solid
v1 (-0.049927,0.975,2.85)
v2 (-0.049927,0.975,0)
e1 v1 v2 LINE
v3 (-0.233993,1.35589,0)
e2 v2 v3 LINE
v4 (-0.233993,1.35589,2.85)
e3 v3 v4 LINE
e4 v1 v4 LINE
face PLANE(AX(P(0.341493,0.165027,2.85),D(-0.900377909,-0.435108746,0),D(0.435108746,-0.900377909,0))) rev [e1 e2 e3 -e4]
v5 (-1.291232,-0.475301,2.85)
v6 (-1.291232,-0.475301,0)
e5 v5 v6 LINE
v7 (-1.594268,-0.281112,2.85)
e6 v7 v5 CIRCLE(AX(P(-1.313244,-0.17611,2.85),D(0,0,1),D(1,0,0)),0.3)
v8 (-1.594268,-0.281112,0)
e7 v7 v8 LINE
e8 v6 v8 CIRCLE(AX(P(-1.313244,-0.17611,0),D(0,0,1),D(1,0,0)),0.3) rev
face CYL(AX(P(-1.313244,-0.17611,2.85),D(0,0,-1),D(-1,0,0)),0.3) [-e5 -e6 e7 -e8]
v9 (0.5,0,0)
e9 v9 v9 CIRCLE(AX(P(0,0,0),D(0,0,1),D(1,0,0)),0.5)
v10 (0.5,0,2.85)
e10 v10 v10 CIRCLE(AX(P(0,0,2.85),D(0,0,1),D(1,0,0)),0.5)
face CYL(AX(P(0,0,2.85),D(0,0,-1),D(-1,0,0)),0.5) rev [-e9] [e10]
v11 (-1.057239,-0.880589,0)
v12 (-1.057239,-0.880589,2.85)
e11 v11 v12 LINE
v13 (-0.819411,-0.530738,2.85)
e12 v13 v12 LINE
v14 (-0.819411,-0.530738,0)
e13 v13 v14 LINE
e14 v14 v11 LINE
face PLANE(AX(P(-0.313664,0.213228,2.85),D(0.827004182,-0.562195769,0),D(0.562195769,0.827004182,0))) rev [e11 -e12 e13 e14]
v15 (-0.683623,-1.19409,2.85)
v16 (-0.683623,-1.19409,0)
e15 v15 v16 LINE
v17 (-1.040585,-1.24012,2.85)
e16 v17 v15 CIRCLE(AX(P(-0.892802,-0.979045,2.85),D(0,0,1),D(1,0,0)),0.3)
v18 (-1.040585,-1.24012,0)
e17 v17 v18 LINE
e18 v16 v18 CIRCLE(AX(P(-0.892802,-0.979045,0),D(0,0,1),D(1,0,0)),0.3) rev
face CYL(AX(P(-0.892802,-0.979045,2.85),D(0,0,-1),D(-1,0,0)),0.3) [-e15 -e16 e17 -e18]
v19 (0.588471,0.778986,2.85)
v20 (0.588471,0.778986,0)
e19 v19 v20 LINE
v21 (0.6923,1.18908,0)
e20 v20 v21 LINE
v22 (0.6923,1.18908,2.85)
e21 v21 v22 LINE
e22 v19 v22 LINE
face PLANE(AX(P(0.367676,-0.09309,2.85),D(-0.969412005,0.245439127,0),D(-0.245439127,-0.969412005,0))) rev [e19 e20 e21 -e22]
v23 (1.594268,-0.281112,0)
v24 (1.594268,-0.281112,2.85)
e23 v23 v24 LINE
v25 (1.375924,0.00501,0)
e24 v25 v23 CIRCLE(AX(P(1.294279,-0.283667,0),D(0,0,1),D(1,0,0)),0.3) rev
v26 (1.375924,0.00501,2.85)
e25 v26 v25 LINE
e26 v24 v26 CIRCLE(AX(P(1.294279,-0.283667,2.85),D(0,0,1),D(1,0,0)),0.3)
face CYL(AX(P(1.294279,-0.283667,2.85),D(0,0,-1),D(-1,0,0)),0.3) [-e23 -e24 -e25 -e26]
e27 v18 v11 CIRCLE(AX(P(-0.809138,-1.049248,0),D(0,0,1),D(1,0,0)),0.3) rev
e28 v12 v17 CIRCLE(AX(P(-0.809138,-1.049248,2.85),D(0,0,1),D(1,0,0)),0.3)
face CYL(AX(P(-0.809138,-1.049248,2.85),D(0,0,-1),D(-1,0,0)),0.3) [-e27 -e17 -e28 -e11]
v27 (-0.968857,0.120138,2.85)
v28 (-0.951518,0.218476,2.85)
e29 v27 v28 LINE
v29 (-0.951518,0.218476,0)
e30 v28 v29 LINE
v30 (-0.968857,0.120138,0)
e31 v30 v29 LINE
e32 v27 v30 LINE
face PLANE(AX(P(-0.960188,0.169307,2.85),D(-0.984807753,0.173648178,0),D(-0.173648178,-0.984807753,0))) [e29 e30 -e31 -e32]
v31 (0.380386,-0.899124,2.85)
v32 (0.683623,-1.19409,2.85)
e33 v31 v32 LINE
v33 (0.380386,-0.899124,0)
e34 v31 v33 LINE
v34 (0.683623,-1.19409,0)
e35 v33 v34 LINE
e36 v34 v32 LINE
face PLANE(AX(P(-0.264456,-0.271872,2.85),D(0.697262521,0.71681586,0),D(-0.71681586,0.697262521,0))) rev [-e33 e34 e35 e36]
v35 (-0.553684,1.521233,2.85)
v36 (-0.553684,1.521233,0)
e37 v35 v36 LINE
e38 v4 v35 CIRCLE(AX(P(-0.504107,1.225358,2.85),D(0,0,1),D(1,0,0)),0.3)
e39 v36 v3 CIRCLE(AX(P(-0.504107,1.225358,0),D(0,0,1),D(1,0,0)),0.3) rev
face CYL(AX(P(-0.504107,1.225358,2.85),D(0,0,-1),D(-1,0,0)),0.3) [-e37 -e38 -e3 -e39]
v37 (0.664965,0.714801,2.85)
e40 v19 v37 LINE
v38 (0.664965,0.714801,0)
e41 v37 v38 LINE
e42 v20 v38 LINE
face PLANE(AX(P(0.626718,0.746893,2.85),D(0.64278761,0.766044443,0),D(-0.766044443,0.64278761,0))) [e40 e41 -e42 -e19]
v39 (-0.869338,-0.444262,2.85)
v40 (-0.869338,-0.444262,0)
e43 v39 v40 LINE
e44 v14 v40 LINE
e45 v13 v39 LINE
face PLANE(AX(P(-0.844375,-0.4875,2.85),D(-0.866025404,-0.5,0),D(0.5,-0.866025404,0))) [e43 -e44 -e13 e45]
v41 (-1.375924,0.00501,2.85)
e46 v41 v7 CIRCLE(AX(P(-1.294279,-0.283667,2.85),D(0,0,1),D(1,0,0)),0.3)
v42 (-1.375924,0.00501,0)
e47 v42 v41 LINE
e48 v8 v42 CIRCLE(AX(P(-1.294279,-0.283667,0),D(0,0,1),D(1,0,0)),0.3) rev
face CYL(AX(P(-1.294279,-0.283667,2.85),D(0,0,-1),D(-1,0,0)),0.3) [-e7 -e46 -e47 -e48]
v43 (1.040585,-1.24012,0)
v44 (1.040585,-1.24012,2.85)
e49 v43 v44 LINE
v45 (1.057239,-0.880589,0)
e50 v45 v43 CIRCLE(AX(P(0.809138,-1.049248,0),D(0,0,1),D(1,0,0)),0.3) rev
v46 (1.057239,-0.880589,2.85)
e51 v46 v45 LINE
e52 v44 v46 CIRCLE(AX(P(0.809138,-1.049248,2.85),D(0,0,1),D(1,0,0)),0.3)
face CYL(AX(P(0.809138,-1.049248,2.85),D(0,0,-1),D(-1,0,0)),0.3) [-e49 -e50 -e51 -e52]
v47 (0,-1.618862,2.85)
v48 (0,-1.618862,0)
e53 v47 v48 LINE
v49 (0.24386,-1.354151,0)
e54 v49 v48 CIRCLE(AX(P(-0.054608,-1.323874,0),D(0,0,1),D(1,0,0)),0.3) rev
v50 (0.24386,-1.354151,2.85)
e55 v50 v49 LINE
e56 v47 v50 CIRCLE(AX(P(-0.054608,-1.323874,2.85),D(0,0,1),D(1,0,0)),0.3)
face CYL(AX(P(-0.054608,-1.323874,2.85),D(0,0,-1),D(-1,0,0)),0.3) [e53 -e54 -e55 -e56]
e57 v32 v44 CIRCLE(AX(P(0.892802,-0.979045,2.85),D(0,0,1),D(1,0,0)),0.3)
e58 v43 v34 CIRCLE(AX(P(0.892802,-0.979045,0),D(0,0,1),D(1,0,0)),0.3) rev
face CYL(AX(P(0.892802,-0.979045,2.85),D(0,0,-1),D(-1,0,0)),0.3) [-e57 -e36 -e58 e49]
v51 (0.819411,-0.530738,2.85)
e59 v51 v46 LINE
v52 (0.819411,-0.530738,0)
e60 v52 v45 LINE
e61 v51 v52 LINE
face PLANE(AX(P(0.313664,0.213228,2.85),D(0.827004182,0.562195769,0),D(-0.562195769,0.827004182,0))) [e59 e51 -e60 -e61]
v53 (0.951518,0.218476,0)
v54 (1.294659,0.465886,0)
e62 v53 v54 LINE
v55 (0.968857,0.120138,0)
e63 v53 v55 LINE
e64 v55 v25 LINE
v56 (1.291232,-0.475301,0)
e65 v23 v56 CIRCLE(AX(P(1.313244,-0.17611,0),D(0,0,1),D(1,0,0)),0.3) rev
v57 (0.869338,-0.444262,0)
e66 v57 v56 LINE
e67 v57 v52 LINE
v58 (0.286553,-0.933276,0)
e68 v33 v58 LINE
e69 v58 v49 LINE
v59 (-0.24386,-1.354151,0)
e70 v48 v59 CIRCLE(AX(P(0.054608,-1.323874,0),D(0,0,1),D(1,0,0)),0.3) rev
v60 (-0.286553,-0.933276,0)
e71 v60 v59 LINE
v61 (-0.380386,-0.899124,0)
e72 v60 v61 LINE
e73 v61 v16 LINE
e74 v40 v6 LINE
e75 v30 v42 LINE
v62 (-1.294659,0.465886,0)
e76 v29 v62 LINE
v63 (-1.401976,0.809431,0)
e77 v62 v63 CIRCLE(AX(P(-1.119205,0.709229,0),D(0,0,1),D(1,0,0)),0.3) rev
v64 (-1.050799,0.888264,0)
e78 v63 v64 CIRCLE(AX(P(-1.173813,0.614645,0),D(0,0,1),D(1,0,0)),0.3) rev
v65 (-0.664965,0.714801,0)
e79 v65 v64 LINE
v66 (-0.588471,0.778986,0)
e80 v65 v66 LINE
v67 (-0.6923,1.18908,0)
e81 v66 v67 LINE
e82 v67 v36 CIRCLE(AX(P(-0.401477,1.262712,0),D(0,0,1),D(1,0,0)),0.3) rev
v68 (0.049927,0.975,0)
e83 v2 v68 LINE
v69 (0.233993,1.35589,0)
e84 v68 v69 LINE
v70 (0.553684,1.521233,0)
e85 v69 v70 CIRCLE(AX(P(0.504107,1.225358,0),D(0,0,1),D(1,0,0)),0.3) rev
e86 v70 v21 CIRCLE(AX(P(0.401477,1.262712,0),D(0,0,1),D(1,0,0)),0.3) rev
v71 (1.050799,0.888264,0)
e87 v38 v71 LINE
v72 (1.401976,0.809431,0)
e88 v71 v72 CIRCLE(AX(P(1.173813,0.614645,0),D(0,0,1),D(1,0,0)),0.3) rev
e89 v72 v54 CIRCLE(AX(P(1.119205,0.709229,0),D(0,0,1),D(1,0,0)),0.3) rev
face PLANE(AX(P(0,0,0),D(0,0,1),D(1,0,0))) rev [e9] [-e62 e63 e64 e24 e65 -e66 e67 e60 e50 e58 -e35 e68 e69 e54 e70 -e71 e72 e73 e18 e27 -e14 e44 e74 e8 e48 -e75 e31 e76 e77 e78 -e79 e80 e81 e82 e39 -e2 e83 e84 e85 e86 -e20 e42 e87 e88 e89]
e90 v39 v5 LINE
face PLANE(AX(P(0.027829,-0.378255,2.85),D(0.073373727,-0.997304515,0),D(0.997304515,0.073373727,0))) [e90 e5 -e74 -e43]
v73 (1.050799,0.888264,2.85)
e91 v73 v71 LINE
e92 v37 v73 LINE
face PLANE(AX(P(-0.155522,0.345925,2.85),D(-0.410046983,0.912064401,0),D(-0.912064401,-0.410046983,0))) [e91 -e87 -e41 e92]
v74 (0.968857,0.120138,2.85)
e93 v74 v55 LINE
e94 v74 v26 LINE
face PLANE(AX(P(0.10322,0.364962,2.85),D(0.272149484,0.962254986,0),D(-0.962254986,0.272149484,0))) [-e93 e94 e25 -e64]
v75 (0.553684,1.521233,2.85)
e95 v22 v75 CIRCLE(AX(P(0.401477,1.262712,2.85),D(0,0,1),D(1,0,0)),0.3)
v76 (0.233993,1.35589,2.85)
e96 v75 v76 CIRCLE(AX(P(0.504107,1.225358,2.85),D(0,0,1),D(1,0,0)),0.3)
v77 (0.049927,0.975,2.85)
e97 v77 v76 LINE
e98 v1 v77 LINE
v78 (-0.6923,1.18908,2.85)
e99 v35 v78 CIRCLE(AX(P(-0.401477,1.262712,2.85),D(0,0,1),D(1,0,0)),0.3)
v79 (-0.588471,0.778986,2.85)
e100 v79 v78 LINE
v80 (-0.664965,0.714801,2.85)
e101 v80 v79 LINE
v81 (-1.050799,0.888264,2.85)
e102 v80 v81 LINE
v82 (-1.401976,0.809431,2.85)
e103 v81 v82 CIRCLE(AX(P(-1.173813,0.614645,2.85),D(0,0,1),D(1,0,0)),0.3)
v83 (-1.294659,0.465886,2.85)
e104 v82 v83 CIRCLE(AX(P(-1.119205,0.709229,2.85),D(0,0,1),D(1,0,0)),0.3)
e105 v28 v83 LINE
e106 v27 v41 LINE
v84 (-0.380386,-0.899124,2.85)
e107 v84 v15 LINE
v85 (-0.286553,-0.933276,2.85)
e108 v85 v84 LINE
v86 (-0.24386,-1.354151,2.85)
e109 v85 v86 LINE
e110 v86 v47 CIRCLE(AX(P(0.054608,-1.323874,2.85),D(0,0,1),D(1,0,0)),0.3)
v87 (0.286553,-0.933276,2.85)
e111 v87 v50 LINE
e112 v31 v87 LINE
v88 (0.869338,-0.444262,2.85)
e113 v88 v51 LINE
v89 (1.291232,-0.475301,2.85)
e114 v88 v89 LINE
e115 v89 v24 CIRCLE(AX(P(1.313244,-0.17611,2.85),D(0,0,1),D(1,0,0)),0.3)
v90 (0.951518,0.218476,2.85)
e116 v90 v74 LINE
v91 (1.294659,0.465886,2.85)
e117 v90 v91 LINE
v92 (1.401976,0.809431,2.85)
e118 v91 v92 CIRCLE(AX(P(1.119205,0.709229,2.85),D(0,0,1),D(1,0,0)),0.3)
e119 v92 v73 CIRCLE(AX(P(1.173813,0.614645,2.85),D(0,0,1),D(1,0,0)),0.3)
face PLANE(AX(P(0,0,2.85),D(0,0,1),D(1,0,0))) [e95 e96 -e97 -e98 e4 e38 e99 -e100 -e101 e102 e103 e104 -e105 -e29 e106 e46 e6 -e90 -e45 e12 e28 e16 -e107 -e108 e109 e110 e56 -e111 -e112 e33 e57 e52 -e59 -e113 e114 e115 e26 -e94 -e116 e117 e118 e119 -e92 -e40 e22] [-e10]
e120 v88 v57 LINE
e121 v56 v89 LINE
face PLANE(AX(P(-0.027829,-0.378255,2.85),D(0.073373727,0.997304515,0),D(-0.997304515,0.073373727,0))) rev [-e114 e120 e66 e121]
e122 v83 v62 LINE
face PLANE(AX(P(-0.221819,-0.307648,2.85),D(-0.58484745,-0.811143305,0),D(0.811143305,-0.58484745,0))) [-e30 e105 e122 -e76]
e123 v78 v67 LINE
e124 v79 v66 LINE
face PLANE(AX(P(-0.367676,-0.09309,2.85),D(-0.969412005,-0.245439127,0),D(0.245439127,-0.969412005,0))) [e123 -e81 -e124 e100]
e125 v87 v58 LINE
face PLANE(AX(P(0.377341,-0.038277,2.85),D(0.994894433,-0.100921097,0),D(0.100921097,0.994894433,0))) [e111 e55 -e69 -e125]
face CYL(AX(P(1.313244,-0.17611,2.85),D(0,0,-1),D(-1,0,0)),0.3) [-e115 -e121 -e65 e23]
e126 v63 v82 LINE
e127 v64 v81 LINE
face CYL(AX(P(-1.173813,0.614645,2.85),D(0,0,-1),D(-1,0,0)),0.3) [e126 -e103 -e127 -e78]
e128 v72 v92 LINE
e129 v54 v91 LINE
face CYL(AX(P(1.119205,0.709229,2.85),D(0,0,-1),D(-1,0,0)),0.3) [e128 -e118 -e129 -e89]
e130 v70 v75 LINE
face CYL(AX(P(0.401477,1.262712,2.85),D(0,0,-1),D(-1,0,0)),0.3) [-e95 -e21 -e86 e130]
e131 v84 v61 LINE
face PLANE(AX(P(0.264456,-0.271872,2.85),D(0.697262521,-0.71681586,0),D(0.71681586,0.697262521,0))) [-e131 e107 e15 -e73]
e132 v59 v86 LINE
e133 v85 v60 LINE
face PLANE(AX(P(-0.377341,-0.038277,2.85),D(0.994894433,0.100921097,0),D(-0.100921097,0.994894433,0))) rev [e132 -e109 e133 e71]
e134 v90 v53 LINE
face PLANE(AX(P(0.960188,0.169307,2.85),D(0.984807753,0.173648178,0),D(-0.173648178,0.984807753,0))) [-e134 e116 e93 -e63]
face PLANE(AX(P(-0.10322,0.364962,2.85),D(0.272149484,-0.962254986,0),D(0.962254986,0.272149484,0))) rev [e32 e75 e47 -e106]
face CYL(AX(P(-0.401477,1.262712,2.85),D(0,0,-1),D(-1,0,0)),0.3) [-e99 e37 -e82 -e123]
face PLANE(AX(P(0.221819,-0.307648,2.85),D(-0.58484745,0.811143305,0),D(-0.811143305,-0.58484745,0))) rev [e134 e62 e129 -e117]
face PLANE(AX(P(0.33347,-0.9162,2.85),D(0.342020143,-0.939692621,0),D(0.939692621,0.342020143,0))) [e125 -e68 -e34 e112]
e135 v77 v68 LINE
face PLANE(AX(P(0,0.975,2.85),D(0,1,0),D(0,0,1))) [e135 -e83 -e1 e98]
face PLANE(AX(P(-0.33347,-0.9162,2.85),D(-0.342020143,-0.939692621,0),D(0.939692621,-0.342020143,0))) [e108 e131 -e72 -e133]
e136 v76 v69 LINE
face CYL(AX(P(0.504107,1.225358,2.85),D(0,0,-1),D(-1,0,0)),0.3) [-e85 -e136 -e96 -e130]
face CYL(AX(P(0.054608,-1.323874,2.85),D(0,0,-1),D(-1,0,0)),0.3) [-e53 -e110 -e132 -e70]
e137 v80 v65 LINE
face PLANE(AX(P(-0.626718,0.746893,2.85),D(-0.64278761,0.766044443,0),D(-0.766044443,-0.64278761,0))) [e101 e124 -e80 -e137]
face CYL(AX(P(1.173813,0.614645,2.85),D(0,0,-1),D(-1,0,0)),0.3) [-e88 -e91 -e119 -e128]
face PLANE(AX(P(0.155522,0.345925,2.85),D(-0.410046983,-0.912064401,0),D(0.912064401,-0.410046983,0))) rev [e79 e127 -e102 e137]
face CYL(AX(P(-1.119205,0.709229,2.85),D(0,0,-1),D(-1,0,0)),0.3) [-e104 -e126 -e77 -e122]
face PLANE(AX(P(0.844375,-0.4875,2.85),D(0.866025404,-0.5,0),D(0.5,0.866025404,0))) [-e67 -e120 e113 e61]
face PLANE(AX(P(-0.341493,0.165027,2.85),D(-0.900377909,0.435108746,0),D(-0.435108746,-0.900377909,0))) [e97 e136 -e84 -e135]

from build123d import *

# Parameters (mm, degrees)
SKETCH2_R           = 0.5
BOSS_EXTRUDE1_DEPTH = 2.85
FILLET2_R           = 0.3
FILLET3_R           = 0.3


with BuildPart() as part:
    # Sketch2 → Boss-Extrude1 (new body)
    with BuildSketch(Plane.XY):
        with BuildLine():
            Line((-0.819411063, -0.530738407), (-1.201999847, -1.093536176))
            ThreePointArc((-1.201999847, -1.093536176), (-1.044529866, -1.24482222), (-0.868197821, -1.373629332))
            Line((-0.868197821, -1.373629332), (-0.38038606, -0.899124125))
            Line((-0.38038606, -0.899124125), (-0.286553219, -0.933276486))
            Line((-0.286553219, -0.933276486), (-0.217873799, -1.610327919))
            ThreePointArc((-0.217873799, -1.610327919), (0, -1.625), (0.217873799, -1.610327919))
            Line((0.217873799, -1.610327919), (0.286553219, -0.933276486))
            Line((0.286553219, -0.933276486), (0.38038606, -0.899124125))
            Line((0.38038606, -0.899124125), (0.868197821, -1.373629332))
            ThreePointArc((0.868197821, -1.373629332), (1.044529866, -1.24482222), (1.201999847, -1.093536176))
            Line((1.201999847, -1.093536176), (0.819411063, -0.530738407))
            Line((0.819411063, -0.530738407), (0.869338475, -0.444261593))
            Line((0.869338475, -0.444261593), (1.548030032, -0.494194315))
            ThreePointArc((1.548030032, -0.494194315), (1.600312599, -0.282178289), (1.623696808, -0.065066703))
            Line((1.623696808, -0.065066703), (0.968857363, 0.120138071))
            Line((0.968857363, 0.120138071), (0.951517755, 0.218475876))
            Line((0.951517755, 0.218475876), (1.503521786, 0.616479715))
            ThreePointArc((1.503521786, 0.616479715), (1.407291281, 0.8125), (1.285647987, 0.993848204))
            Line((1.285647987, 0.993848204), (0.664964536, 0.71480061))
            Line((0.664964536, 0.71480061), (0.588471303, 0.778986054))
            Line((0.588471303, 0.778986054), (0.755498987, 1.438696035))
            ThreePointArc((0.755498987, 1.438696035), (0.555782733, 1.527000509), (0.346030185, 1.587730491))
            Line((0.346030185, 1.587730491), (0.049927412, 0.975))
            Line((0.049927412, 0.975), (-0.049927412, 0.975))
            Line((-0.049927412, 0.975), (-0.346030185, 1.587730491))
            ThreePointArc((-0.346030185, 1.587730491), (-0.555782733, 1.527000509), (-0.755498987, 1.438696035))
            Line((-0.755498987, 1.438696035), (-0.588471303, 0.778986054))
            Line((-0.588471303, 0.778986054), (-0.664964536, 0.71480061))
            Line((-0.664964536, 0.71480061), (-1.285647987, 0.993848204))
            ThreePointArc((-1.285647987, 0.993848204), (-1.407291281, 0.8125), (-1.503521786, 0.616479715))
            Line((-1.503521786, 0.616479715), (-0.951517755, 0.218475876))
            Line((-0.951517755, 0.218475876), (-0.968857363, 0.120138071))
            Line((-0.968857363, 0.120138071), (-1.623696808, -0.065066703))
            ThreePointArc((-1.623696808, -0.065066703), (-1.600312599, -0.282178289), (-1.548030032, -0.494194315))
            Line((-1.548030032, -0.494194315), (-0.869338475, -0.444261593))
            Line((-0.869338475, -0.444261593), (-0.819411063, -0.530738407))
        make_face()
        Circle(SKETCH2_R, mode=Mode.SUBTRACT)
    extrude(amount=BOSS_EXTRUDE1_DEPTH)

    # Fillet2
    # the kernel refuses this fillet: 0.3 mm, written as the material it takes off along each edge
    with BuildSketch(Plane(origin=(-0.755498987, 1.438696035, -0.712889988), x_dir=(0.9227293829485229, 0.38544842176799504, 0), z_dir=(0, 0, 1))) as fillet2_piece_1:
        with BuildLine():
            CenterArc((0.258833903, -0.298843015), FILLET2_R, 84.966378176, 86.569826399)
            Line((-0.037898816, -0.254687685), (0, 0))
            ThreePointArc((0, 0), (0.142577998, 0.006267003), (0.285155995, 0))
        make_face()
    extrude(amount=4.275779976, mode=Mode.SUBTRACT)
    with BuildSketch(Plane(origin=(-0.346030185, 1.587730491, -0.712889988), x_dir=(0.4351087462469743, -0.9003779089578919, 0), z_dir=(0, 0, 1))) as fillet2_piece_2:
        with BuildLine():
            CenterArc((0.257492014, -0.3), FILLET2_R, 90, 86.569826399)
            ThreePointArc((-0.041970524, -0.28205038), (-0.027184012, -0.140102785), (0, 0))
            Line((0, 0), (0.257492014, 0))
        make_face()
    extrude(amount=4.275779976, mode=Mode.SUBTRACT)

    # Fillet3
    # the kernel refuses this fillet: 0.3 mm, written as the material it takes off along each edge
    with BuildSketch(Plane(origin=(-1.285647987, 0.993848204, -0.712889988), x_dir=(-0.5398228699721833, -0.8417786342352693, 0), z_dir=(0, 0, 1)), Plane(origin=(-1.201999847, -1.093536176, -0.712889988), x_dir=(0.7352508676813189, -0.6777950734358195, 0), z_dir=(0, 0, 1)), Plane(origin=(-0.217873799, -1.610327919, -0.712889988), x_dir=(0.998913116596804, -0.04661100182209958, 0), z_dir=(0, 0, 1)), Plane(origin=(0.868197821, -1.373629332, -0.712889988), x_dir=(0.795172816573963, 0.6063828755677642, 0), z_dir=(0, 0, 1)), Plane(origin=(1.548030032, -0.494194315, -0.712889988), x_dir=(0.21936231831469838, 0.9756434662844828, 0), z_dir=(0, 0, 1)), Plane(origin=(1.503521786, 0.616479715, -0.712889988), x_dir=(-0.45909024662462017, 0.8883896360573694, 0), z_dir=(0, 0, 1)), Plane(origin=(0.755498987, 1.438696035, -0.712889988), x_dir=(-0.922729382948523, 0.38544842176799504, 0), z_dir=(0, 0, 1))) as fillet3_piece_1:
        with BuildLine():
            CenterArc((0.258833903, 0.298843015), FILLET3_R, 188.463795424, 86.569826399)
            Line((-0.037898816, 0.254687685), (0, 0))
            ThreePointArc((0, 0), (0.142577998, -0.006267003), (0.285155995, 0))
        make_face()
    extrude(amount=4.275779976, mode=Mode.SUBTRACT)
    with BuildSketch(Plane(origin=(-1.503521786, 0.616479715, -0.712889988), x_dir=(0.8111433045099228, -0.5848474498095403, 0), z_dir=(0, 0, 1)), Plane(origin=(-1.548030032, -0.494194315, -0.712889988), x_dir=(0.9973045152873341, 0.07337372682026923, 0), z_dir=(0, 0, 1)), Plane(origin=(-0.868197821, -1.373629332, -0.712889988), x_dir=(0.7168158595567345, 0.6972625212127351, 0), z_dir=(0, 0, 1)), Plane(origin=(0.217873799, -1.610327919, -0.712889988), x_dir=(0.1009210966186461, 0.9948944327200197, 0), z_dir=(0, 0, 1)), Plane(origin=(1.201999847, -1.093536176, -0.712889988), x_dir=(-0.5621957690403601, 0.8270041821376227, 0), z_dir=(0, 0, 1)), Plane(origin=(1.623696808, -0.065066703, -0.712889988), x_dir=(-0.962254986255382, 0.2721494836053427, 0), z_dir=(0, 0, 1)), Plane(origin=(1.285647987, 0.993848204, -0.712889988), x_dir=(-0.912064401128568, -0.41004698291047903, 0), z_dir=(0, 0, 1)), Plane(origin=(0.346030185, 1.587730491, -0.712889988), x_dir=(-0.435108746246974, -0.9003779089578923, 0), z_dir=(0, 0, 1))) as fillet3_piece_2:
        with BuildLine():
            CenterArc((0.257492014, 0.3), FILLET3_R, 183.430173601, 86.569826399)
            ThreePointArc((-0.041970524, 0.28205038), (-0.027184012, 0.140102785), (0, 0))
            Line((0, 0), (0.257492014, 0))
        make_face()
    extrude(amount=4.275779976, mode=Mode.SUBTRACT)
    with BuildSketch(Plane(origin=(-1.623696808, -0.065066703, -0.712889988), x_dir=(0.9622549862553823, 0.27214948360534136, 0), z_dir=(0, 0, 1))) as fillet3_piece_3:
        with BuildLine():
            CenterArc((0.257492014, -0.3), FILLET3_R, 90, 86.569826399)
            ThreePointArc((-0.041970524, -0.28205038), (-0.027184012, -0.140102785), (0, 0))
            Line((0, 0), (0.257492014, 0))
        make_face()
    extrude(amount=4.275779976, mode=Mode.SUBTRACT)


solid = part.part
